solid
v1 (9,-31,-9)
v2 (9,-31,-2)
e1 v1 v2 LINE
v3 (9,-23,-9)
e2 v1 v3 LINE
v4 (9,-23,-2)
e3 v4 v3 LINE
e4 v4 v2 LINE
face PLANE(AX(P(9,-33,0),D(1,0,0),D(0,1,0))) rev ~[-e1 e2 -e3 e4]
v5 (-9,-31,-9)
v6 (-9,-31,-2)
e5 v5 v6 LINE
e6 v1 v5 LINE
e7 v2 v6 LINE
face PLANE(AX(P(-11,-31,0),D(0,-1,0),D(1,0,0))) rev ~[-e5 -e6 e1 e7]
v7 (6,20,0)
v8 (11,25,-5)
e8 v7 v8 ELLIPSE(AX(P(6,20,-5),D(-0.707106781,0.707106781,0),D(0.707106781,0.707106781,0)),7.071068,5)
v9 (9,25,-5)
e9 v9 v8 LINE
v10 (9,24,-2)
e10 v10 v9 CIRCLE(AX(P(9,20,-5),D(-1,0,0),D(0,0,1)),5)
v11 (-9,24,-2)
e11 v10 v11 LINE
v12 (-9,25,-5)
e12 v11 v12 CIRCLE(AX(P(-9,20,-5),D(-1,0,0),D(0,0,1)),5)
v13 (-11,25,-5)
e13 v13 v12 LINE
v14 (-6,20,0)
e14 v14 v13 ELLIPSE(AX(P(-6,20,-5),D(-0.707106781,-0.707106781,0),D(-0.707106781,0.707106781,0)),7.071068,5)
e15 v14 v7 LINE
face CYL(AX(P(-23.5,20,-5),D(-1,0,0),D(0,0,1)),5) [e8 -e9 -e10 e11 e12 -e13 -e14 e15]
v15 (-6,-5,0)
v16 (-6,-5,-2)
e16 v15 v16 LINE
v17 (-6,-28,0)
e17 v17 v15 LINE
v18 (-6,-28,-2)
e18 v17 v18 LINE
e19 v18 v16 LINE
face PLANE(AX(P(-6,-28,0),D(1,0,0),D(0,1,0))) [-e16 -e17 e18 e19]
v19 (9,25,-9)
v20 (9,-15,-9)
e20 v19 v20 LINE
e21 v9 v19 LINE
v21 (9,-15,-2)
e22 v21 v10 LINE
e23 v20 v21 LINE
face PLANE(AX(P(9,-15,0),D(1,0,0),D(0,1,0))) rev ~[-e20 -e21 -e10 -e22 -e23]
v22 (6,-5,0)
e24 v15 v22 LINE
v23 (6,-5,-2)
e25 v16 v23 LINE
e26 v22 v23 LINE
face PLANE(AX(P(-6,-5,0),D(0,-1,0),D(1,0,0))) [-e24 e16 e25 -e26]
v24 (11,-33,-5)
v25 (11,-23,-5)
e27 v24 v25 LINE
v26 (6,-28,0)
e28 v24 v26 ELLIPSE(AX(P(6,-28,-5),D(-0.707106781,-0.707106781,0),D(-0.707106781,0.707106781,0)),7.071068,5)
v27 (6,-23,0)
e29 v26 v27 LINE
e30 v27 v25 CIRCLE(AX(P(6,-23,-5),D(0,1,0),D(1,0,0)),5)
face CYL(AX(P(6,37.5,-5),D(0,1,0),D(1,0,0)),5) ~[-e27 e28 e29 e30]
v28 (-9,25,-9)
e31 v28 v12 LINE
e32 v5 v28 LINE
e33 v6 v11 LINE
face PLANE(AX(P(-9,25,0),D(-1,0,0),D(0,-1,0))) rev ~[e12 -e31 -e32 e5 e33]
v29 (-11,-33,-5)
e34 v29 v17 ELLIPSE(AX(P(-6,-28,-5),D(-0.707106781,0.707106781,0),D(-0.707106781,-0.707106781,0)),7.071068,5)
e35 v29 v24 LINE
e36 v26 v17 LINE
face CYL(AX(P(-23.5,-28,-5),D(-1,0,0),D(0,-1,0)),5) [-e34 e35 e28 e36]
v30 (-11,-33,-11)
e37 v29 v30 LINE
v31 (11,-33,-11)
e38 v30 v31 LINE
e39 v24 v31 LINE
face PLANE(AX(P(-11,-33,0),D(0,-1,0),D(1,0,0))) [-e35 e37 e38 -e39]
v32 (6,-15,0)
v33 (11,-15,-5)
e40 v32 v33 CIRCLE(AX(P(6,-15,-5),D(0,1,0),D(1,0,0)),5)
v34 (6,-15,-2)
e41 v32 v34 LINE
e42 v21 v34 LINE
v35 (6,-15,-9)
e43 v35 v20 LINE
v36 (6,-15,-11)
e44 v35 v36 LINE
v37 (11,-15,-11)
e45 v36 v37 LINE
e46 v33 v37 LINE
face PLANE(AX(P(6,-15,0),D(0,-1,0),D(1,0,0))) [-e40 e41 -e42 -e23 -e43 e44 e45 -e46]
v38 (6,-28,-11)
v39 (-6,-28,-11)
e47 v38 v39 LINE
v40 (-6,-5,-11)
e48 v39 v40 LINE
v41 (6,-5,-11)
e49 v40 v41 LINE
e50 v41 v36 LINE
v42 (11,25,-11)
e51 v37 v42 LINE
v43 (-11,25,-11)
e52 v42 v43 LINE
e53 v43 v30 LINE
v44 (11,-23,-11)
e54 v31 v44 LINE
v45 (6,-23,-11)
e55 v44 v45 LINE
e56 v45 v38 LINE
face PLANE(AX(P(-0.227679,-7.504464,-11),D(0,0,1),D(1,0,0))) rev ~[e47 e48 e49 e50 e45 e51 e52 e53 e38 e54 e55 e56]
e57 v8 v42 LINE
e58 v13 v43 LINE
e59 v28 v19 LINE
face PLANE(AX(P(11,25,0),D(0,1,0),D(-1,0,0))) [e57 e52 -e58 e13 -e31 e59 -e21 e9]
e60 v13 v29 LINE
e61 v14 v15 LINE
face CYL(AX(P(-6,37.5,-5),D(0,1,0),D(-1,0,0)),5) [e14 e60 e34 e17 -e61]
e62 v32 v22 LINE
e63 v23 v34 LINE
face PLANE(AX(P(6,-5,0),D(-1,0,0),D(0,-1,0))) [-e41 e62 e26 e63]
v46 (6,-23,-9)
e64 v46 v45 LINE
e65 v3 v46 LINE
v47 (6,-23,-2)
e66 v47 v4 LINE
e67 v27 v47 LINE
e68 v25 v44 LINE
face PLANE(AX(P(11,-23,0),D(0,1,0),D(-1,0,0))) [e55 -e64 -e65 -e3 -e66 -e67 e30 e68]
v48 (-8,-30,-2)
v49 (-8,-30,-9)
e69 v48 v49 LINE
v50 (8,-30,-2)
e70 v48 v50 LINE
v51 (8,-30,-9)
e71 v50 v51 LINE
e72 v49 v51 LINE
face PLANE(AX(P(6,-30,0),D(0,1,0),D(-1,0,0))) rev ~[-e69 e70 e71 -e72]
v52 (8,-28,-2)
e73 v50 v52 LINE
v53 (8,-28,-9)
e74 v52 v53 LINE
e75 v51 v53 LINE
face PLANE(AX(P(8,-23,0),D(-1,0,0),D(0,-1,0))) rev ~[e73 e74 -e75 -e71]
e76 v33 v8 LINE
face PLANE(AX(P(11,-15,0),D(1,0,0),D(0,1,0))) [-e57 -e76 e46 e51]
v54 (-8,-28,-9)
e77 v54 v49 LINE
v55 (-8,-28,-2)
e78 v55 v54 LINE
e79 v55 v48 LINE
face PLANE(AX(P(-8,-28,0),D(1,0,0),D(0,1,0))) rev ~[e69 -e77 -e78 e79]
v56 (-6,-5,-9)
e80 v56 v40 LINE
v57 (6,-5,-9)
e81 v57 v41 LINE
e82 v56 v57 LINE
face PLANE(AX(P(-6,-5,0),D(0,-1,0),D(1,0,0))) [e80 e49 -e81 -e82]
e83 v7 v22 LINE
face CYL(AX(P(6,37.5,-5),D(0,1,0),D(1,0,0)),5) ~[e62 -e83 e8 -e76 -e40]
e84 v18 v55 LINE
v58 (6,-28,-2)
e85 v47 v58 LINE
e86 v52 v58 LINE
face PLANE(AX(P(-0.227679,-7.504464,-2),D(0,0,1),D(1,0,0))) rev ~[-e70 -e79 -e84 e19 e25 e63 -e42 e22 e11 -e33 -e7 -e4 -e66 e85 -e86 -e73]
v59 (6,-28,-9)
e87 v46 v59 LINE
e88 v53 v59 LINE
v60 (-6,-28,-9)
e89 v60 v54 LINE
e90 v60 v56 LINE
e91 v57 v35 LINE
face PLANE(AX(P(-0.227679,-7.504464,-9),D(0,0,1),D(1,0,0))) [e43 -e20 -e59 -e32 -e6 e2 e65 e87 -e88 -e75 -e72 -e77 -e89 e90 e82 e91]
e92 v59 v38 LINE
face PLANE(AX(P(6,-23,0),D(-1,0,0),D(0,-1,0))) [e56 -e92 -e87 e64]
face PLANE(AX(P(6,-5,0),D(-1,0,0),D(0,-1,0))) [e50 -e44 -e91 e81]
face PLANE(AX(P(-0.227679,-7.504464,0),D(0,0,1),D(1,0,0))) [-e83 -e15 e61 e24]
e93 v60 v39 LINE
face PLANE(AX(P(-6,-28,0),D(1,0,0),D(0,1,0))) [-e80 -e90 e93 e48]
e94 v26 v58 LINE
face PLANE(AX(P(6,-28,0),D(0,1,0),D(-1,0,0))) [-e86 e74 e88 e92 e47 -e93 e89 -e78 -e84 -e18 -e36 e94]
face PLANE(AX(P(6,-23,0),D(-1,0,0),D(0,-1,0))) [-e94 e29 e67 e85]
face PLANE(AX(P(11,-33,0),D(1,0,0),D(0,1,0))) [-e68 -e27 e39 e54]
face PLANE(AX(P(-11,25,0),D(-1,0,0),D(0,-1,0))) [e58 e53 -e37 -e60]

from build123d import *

# Parameters (mm, degrees)
F1_DEPTH    = 11
F2_T        = -2
F3_DEPTH    = 25
F4_DEPTH    = 2
F5_DEPTH    = 2
F6_DEPTH    = 1
F7_T1_DEPTH = 65
F7_T3_DEPTH = 47
F7_T5_DEPTH = 83
F7_T7_DEPTH = 35


# Not quite as in the source:
# - a fillet or chamfer that OpenCascade refuses, or shapes differently, is made with other operations: its cross-section is extruded or revolved along the edge and cut away or added


with BuildPart() as f1:
    # F0 (on Top) → F1 (new body)
    with BuildSketch(Plane.XY):
        Polygon((11, -15), (11, 25), (-11, 25), (-11, -33), (11, -33), (11, -23), (6, -23), (6, -28), (-6, -28), (-6, -15), (-6, -5), (6, -5), (6, -15), align=None)
    extrude(amount=-F1_DEPTH)

    # F2
    f2_openings = [f1.faces().sort_by_distance(p)[0] for p in [
        (0, 25, -5.5),
    ]]
    offset(amount=F2_T, openings=f2_openings, kind=Kind.INTERSECTION)

    # F3 (cut): a face of the model
    f3_faces = [f1.faces().sort_by_distance(p)[0] for p in [
        (0, -3, -5.5),
    ]]
    extrude(f3_faces, amount=-F3_DEPTH, mode=Mode.SUBTRACT)

    # F4 (add): a face of the model
    f4_faces = [f1.faces().sort_by_distance(p)[0] for p in [
        (8, -14, -5.5),
    ]]
    extrude(f4_faces, amount=-F4_DEPTH)

    # F5 (add): a face of the model
    f5_faces = [f1.faces().sort_by_distance(p)[0] for p in [
        (8, -14, -5.5),
    ]]
    extrude(f5_faces, amount=-F5_DEPTH)

    # F6 (cut): faces of the model
    f6_faces = [f1.faces().sort_by_distance(p)[0] for p in [
        (8, -14, -5.5),
        (8, -24, -5.5),
    ]]
    extrude(f6_faces, amount=-F6_DEPTH, mode=Mode.SUBTRACT)

    # F7: fillet of radius 5 on 5 edges, made by hand

    # F7_s2 → F7_t1 (cut)
    with BuildSketch(Plane.XZ.offset(-37.5)):
        with BuildLine():
            ThreePointArc((11, -5), (9.5355339059, -1.4644660941), (6, 0))
            Line((6, 0), (11, 0))
            Line((11, 0), (11, -5))
        make_face()
    extrude(amount=F7_T1_DEPTH, mode=Mode.SUBTRACT)

    # F7_s4 → F7_t3 (cut)
    with BuildSketch(Plane.YZ.offset(-23.5)):
        with BuildLine():
            ThreePointArc((20, 0), (23.5355339059, -1.4644660941), (25, -5))
            Line((25, -5), (25, 0))
            Line((25, 0), (20, 0))
        make_face()
        with BuildLine():
            ThreePointArc((-33, -5), (-31.5355339059, -1.4644660941), (-28, 0))
            Line((-28, 0), (-33, 0))
            Line((-33, 0), (-33, -5))
        make_face()
    extrude(amount=F7_T3_DEPTH, mode=Mode.SUBTRACT)

    # F7_s6 → F7_t5 (cut)
    with BuildSketch(Plane.XZ.offset(-37.5)):
        with BuildLine():
            ThreePointArc((-11, -5), (-9.5355339059, -1.4644660941), (-6, 0))
            Line((-6, 0), (-11, 0))
            Line((-11, 0), (-11, -5))
        make_face()
    extrude(amount=F7_T5_DEPTH, mode=Mode.SUBTRACT)

    # F7_s8 → F7_t7 (cut)
    with BuildSketch(Plane.XZ.offset(10.5)):
        with BuildLine():
            ThreePointArc((11, -5), (9.5355339059, -1.4644660941), (6, 0))
            Line((6, 0), (11, 0))
            Line((11, 0), (11, -5))
        make_face()
    extrude(amount=F7_T7_DEPTH, mode=Mode.SUBTRACT)


solid = f1.part
